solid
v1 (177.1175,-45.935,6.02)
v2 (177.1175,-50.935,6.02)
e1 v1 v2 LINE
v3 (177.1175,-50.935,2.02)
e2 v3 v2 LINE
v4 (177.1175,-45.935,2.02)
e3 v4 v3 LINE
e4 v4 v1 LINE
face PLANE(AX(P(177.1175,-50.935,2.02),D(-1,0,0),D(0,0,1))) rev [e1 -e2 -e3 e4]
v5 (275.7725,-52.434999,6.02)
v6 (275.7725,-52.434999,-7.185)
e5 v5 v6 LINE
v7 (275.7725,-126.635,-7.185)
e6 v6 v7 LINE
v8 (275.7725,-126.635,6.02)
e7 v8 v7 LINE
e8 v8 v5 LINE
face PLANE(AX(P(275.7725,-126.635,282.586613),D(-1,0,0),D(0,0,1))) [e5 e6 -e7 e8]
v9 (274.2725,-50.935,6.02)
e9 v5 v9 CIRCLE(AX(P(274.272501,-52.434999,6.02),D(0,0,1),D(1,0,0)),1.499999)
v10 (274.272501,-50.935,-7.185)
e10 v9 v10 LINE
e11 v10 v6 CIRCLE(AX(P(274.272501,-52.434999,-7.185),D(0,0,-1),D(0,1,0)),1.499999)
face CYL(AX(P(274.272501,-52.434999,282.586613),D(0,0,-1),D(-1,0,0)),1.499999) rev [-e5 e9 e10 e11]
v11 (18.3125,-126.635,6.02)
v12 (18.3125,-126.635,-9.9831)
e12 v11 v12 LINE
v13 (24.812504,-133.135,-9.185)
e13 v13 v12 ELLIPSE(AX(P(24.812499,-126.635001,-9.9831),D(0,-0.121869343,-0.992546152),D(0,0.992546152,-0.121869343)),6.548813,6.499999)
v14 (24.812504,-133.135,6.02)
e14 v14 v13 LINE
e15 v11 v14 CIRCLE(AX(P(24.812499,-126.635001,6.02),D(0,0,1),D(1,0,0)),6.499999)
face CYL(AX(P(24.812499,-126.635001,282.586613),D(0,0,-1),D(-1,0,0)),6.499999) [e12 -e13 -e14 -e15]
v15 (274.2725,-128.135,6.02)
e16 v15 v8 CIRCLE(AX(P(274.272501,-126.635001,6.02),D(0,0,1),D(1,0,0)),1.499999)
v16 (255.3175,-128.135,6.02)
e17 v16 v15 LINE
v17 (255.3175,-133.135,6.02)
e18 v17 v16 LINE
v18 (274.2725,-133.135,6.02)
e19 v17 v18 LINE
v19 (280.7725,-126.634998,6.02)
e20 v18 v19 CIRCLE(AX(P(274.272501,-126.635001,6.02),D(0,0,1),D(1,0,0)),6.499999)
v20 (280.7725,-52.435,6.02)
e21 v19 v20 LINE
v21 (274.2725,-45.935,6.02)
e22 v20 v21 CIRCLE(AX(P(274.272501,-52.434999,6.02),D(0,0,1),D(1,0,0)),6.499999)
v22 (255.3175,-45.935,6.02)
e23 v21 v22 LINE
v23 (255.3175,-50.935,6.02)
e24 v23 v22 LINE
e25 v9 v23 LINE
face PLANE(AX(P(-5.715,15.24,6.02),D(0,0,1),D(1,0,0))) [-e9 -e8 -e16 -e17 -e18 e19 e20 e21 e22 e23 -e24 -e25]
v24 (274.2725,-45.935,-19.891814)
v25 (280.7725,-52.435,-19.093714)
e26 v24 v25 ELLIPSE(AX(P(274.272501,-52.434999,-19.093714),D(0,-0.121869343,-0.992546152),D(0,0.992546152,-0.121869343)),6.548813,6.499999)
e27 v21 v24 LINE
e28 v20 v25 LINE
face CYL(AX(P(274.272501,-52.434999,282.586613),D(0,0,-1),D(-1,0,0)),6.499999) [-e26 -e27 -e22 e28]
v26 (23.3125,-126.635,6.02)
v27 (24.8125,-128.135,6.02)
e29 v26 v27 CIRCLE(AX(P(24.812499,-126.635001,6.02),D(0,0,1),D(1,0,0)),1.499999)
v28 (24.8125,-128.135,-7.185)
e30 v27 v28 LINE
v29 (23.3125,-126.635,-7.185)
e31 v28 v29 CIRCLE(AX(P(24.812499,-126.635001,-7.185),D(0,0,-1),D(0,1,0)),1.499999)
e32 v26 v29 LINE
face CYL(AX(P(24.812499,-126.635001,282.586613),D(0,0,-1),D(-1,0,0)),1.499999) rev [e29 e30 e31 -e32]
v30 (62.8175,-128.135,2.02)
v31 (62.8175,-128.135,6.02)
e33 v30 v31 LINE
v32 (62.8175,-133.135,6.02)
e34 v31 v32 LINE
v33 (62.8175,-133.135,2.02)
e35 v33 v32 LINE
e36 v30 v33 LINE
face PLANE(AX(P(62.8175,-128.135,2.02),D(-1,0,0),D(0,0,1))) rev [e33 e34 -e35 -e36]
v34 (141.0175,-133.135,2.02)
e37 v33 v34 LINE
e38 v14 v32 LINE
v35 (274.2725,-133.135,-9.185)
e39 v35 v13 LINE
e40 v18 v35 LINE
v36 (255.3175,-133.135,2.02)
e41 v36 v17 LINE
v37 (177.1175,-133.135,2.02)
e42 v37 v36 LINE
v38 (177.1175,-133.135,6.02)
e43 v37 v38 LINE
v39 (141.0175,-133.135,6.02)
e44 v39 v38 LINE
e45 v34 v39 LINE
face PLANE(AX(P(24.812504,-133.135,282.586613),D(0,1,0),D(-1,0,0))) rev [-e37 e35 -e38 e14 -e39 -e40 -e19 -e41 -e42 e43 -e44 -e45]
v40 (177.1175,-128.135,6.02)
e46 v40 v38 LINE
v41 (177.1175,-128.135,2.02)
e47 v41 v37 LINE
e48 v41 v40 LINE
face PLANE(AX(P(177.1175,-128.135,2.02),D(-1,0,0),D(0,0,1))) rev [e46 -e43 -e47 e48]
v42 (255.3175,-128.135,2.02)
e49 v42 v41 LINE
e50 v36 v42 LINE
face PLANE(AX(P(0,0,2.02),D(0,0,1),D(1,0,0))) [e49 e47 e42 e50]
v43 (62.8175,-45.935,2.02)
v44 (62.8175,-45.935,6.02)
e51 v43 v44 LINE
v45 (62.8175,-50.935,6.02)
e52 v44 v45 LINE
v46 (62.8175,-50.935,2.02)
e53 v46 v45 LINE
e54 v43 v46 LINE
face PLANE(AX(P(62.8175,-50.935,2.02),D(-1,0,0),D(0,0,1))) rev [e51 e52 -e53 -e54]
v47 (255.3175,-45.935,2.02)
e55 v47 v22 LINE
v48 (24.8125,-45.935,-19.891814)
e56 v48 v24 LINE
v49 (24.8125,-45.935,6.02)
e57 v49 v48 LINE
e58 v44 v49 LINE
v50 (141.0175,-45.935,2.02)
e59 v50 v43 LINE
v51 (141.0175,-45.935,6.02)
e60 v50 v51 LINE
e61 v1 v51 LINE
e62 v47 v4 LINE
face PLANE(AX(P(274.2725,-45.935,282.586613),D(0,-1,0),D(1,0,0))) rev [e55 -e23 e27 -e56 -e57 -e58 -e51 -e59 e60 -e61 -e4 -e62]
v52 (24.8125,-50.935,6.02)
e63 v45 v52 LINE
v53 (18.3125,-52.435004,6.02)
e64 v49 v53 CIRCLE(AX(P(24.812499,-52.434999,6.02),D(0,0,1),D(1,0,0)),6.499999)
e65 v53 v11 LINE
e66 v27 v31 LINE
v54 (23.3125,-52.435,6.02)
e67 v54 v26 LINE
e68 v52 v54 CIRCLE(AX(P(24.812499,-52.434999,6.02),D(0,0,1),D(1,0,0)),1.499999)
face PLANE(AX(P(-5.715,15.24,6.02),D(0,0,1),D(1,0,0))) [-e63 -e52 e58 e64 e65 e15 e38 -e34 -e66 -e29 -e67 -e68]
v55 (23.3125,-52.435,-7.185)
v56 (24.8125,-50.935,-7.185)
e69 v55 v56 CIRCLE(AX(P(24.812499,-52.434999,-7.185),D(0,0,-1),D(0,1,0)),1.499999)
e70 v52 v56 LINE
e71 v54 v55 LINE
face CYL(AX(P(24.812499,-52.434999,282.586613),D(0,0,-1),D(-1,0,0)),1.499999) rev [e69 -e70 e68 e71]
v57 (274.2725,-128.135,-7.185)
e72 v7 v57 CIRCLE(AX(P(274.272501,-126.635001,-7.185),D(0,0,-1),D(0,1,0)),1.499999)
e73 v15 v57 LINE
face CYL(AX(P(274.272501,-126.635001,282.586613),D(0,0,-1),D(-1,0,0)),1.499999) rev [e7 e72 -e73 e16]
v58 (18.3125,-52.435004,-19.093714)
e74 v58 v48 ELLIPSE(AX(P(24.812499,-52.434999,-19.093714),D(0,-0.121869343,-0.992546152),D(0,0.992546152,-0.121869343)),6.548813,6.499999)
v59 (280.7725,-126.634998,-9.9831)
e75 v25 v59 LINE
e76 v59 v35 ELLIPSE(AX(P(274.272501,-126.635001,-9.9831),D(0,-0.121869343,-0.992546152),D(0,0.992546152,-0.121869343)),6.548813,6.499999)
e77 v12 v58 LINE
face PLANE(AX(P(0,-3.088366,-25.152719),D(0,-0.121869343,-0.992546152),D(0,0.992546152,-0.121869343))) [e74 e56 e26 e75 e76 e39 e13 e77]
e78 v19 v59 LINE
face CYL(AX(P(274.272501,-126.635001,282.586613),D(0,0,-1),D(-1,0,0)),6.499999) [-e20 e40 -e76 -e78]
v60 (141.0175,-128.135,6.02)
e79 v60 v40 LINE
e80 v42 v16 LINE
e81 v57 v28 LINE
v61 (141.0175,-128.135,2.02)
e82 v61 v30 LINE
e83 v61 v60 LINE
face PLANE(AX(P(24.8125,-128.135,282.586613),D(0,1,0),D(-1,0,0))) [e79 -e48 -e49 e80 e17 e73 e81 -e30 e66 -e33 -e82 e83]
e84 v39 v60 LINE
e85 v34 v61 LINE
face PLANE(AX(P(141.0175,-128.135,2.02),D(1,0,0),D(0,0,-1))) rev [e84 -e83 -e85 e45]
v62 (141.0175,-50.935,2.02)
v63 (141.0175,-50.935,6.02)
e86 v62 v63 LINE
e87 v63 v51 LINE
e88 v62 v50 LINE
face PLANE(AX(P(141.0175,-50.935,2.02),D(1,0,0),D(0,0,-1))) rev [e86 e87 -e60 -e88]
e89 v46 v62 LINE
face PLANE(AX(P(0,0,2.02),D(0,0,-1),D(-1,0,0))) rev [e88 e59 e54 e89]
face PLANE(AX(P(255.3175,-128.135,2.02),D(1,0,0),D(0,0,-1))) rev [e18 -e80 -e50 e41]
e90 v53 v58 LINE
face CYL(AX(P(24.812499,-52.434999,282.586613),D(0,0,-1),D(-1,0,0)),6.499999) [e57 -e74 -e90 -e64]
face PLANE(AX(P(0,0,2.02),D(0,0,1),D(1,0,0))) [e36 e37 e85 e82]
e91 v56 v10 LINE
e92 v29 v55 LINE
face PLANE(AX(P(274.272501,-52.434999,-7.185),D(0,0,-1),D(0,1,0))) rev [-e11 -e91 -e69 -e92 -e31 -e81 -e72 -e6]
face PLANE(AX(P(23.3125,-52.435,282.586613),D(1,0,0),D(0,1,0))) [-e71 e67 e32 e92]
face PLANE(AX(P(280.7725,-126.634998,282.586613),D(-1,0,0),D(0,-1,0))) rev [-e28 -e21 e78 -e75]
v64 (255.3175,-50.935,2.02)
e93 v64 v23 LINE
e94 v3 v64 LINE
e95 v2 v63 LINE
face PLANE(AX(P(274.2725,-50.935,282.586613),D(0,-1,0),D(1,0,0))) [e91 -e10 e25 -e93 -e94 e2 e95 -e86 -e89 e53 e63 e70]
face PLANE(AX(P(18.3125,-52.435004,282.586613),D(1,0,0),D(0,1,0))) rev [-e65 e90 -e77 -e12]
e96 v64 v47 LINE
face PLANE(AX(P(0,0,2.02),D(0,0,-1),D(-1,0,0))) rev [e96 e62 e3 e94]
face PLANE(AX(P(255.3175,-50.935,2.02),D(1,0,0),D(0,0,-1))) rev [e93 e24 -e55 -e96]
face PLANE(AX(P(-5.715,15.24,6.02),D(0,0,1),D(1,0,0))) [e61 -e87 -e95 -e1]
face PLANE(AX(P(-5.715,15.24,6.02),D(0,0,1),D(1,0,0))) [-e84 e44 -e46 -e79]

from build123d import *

# Parameters (mm, degrees)
MAIN_CASE_OUTLINE_DEPTH      = 6.02
MAIN_CASE_OUTLINE_DEPTH_BACK = 6.185
SKETCH2_W                    = 78.2
SKETCH2_H                    = 5
GASKET_CUTOUTS_DEPTH         = 4
MAKE_START                   = -9.185
MAKE_ROOM_FOR_BATTERY_DEPTH  = 3
SOLIDIFY_BOTTOM_DEPTH        = 2
MOVE_FACE2_BY                = 15


# Read off the part's stored shape, not the designer's step: Make Room for Battery
with BuildPart() as part:
    # Sketch1 → Main Case Outline (new, two sides: drawn at the far end of the back side and taken through both)
    with BuildSketch(Plane.XY.offset(-MAIN_CASE_OUTLINE_DEPTH_BACK)):
        with BuildLine():
            Line((274.272499626, -45.935), (24.8125, -45.935))
            ThreePointArc((24.8125, -45.935), (20.216304251, -47.838807156), (18.3125, -52.435004109))
            Line((18.3125, -52.435004109), (18.3125, -126.635))
            ThreePointArc((18.3125, -126.635), (20.216307156, -131.231195749), (24.812504109, -133.135))
            Line((24.812504109, -133.135), (274.2725, -133.135))
            ThreePointArc((274.2725, -133.135), (278.868695177, -131.231193416), (280.7725, -126.63499751))
            Line((280.7725, -126.63499751), (280.7725, -52.435))
            ThreePointArc((280.7725, -52.435), (278.868694164, -47.838805571), (274.272499626, -45.935))
        make_face()
        with BuildLine():
            Line((275.7725, -126.635), (275.7725, -52.435))
            ThreePointArc((275.7725, -52.435), (275.333160259, -51.374339477), (274.272499626, -50.935))
            Line((274.272499626, -50.935), (24.8125, -50.935))
            ThreePointArc((24.8125, -50.935), (23.751839477, -51.374339741), (23.3125, -52.435000374))
            Line((23.3125, -52.435000374), (23.3125, -126.635))
            ThreePointArc((23.3125, -126.635), (23.751839741, -127.695660523), (24.812500374, -128.135))
            Line((24.812500374, -128.135), (274.2725, -128.135))
            ThreePointArc((274.2725, -128.135), (275.333160391, -127.695660391), (275.7725, -126.635))
        make_face(mode=Mode.SUBTRACT)
    extrude(amount=MAIN_CASE_OUTLINE_DEPTH + MAIN_CASE_OUTLINE_DEPTH_BACK)

    # Sketch2 → Gasket Cutouts (cut)
    with BuildSketch(Plane.XY.offset(6.02)):
        with Locations((101.9175, -130.635)):
            Rectangle(SKETCH2_W, SKETCH2_H)
        with Locations((216.2175, -130.635)):
            Rectangle(SKETCH2_W, SKETCH2_H)
        with Locations((101.9175, -48.435)):
            Rectangle(SKETCH2_W, SKETCH2_H)
        with Locations((216.2175, -48.435)):
            Rectangle(SKETCH2_W, SKETCH2_H)
    extrude(amount=-GASKET_CUTOUTS_DEPTH, mode=Mode.SUBTRACT)

    # Make Room for Battery outline → Make Room for Battery (add)
    with BuildSketch(Plane.XY.offset(MAKE_START)):
        with BuildLine():
            Line((280.7725, -126.63499751), (280.7725, -52.435))
            ThreePointArc((280.7725, -52.435), (278.868694164, -47.838805571), (274.272499626, -45.935))
            Line((274.272499626, -45.935), (24.8125, -45.935))
            ThreePointArc((24.8125, -45.935), (20.216304251, -47.838807156), (18.3125, -52.435004109))
            Line((18.3125, -52.435004109), (18.3125, -126.635))
            ThreePointArc((18.3125, -126.635), (20.216307156, -131.231195749), (24.812504109, -133.135))
            Line((24.812504109, -133.135), (274.2725, -133.135))
            ThreePointArc((274.2725, -133.135), (278.868695177, -131.231193416), (280.7725, -126.63499751))
        make_face()
        with BuildLine():
            ThreePointArc((275.7725, -126.635), (275.333160391, -127.695660391), (274.2725, -128.135))
            Line((274.2725, -128.135), (24.812500374, -128.135))
            ThreePointArc((24.812500374, -128.135), (23.751839741, -127.695660523), (23.3125, -126.635))
            Line((23.3125, -126.635), (23.3125, -52.435000374))
            ThreePointArc((23.3125, -52.435000374), (23.751839477, -51.374339741), (24.8125, -50.935))
            Line((24.8125, -50.935), (274.272499626, -50.935))
            ThreePointArc((274.272499626, -50.935), (275.333160259, -51.374339477), (275.7725, -52.435))
            Line((275.7725, -52.435), (275.7725, -126.635))
        make_face(mode=Mode.SUBTRACT)
    extrude(amount=MAKE_ROOM_FOR_BATTERY_DEPTH)

    # Sketch3 → Solidify Bottom (add)
    with BuildSketch(Plane(origin=(0, 0, -9.185), x_dir=(-1, 0, 0), z_dir=(0, 0, -1))):
        with BuildLine():
            Line((-280.7725, -52.435), (-280.7725, -126.63499751))
            ThreePointArc((-280.7725, -126.63499751), (-278.868695177, -131.231193416), (-274.2725, -133.135))
            Line((-274.2725, -133.135), (-24.812504109, -133.135))
            ThreePointArc((-24.812504109, -133.135), (-20.216307156, -131.231195749), (-18.3125, -126.635))
            Line((-18.3125, -126.635), (-18.3125, -52.435004109))
            ThreePointArc((-18.3125, -52.435004109), (-20.216304251, -47.838807156), (-24.8125, -45.935))
            Line((-24.8125, -45.935), (-274.272499626, -45.935))
            ThreePointArc((-274.272499626, -45.935), (-278.868694164, -47.838805571), (-280.7725, -52.435))
        make_face()
    extrude(amount=-SOLIDIFY_BOTTOM_DEPTH)

    # Move Face2: a face moved outward by 15.0
    extrude(part.faces().sort_by_distance((149.5425, -89.535, -9.185))[0], amount=MOVE_FACE2_BY, dir=(0, 0, -1))

    # Cut Bottom Face to Angle
    split(bisect_by=Plane(origin=(0, -3.088365547, -25.152718908), x_dir=(-1, 0, 0), z_dir=(2.5491867248569473e-15, -0.12186934340514763, -0.992546151641322)), keep=Keep.BOTTOM)


solid = part.part
